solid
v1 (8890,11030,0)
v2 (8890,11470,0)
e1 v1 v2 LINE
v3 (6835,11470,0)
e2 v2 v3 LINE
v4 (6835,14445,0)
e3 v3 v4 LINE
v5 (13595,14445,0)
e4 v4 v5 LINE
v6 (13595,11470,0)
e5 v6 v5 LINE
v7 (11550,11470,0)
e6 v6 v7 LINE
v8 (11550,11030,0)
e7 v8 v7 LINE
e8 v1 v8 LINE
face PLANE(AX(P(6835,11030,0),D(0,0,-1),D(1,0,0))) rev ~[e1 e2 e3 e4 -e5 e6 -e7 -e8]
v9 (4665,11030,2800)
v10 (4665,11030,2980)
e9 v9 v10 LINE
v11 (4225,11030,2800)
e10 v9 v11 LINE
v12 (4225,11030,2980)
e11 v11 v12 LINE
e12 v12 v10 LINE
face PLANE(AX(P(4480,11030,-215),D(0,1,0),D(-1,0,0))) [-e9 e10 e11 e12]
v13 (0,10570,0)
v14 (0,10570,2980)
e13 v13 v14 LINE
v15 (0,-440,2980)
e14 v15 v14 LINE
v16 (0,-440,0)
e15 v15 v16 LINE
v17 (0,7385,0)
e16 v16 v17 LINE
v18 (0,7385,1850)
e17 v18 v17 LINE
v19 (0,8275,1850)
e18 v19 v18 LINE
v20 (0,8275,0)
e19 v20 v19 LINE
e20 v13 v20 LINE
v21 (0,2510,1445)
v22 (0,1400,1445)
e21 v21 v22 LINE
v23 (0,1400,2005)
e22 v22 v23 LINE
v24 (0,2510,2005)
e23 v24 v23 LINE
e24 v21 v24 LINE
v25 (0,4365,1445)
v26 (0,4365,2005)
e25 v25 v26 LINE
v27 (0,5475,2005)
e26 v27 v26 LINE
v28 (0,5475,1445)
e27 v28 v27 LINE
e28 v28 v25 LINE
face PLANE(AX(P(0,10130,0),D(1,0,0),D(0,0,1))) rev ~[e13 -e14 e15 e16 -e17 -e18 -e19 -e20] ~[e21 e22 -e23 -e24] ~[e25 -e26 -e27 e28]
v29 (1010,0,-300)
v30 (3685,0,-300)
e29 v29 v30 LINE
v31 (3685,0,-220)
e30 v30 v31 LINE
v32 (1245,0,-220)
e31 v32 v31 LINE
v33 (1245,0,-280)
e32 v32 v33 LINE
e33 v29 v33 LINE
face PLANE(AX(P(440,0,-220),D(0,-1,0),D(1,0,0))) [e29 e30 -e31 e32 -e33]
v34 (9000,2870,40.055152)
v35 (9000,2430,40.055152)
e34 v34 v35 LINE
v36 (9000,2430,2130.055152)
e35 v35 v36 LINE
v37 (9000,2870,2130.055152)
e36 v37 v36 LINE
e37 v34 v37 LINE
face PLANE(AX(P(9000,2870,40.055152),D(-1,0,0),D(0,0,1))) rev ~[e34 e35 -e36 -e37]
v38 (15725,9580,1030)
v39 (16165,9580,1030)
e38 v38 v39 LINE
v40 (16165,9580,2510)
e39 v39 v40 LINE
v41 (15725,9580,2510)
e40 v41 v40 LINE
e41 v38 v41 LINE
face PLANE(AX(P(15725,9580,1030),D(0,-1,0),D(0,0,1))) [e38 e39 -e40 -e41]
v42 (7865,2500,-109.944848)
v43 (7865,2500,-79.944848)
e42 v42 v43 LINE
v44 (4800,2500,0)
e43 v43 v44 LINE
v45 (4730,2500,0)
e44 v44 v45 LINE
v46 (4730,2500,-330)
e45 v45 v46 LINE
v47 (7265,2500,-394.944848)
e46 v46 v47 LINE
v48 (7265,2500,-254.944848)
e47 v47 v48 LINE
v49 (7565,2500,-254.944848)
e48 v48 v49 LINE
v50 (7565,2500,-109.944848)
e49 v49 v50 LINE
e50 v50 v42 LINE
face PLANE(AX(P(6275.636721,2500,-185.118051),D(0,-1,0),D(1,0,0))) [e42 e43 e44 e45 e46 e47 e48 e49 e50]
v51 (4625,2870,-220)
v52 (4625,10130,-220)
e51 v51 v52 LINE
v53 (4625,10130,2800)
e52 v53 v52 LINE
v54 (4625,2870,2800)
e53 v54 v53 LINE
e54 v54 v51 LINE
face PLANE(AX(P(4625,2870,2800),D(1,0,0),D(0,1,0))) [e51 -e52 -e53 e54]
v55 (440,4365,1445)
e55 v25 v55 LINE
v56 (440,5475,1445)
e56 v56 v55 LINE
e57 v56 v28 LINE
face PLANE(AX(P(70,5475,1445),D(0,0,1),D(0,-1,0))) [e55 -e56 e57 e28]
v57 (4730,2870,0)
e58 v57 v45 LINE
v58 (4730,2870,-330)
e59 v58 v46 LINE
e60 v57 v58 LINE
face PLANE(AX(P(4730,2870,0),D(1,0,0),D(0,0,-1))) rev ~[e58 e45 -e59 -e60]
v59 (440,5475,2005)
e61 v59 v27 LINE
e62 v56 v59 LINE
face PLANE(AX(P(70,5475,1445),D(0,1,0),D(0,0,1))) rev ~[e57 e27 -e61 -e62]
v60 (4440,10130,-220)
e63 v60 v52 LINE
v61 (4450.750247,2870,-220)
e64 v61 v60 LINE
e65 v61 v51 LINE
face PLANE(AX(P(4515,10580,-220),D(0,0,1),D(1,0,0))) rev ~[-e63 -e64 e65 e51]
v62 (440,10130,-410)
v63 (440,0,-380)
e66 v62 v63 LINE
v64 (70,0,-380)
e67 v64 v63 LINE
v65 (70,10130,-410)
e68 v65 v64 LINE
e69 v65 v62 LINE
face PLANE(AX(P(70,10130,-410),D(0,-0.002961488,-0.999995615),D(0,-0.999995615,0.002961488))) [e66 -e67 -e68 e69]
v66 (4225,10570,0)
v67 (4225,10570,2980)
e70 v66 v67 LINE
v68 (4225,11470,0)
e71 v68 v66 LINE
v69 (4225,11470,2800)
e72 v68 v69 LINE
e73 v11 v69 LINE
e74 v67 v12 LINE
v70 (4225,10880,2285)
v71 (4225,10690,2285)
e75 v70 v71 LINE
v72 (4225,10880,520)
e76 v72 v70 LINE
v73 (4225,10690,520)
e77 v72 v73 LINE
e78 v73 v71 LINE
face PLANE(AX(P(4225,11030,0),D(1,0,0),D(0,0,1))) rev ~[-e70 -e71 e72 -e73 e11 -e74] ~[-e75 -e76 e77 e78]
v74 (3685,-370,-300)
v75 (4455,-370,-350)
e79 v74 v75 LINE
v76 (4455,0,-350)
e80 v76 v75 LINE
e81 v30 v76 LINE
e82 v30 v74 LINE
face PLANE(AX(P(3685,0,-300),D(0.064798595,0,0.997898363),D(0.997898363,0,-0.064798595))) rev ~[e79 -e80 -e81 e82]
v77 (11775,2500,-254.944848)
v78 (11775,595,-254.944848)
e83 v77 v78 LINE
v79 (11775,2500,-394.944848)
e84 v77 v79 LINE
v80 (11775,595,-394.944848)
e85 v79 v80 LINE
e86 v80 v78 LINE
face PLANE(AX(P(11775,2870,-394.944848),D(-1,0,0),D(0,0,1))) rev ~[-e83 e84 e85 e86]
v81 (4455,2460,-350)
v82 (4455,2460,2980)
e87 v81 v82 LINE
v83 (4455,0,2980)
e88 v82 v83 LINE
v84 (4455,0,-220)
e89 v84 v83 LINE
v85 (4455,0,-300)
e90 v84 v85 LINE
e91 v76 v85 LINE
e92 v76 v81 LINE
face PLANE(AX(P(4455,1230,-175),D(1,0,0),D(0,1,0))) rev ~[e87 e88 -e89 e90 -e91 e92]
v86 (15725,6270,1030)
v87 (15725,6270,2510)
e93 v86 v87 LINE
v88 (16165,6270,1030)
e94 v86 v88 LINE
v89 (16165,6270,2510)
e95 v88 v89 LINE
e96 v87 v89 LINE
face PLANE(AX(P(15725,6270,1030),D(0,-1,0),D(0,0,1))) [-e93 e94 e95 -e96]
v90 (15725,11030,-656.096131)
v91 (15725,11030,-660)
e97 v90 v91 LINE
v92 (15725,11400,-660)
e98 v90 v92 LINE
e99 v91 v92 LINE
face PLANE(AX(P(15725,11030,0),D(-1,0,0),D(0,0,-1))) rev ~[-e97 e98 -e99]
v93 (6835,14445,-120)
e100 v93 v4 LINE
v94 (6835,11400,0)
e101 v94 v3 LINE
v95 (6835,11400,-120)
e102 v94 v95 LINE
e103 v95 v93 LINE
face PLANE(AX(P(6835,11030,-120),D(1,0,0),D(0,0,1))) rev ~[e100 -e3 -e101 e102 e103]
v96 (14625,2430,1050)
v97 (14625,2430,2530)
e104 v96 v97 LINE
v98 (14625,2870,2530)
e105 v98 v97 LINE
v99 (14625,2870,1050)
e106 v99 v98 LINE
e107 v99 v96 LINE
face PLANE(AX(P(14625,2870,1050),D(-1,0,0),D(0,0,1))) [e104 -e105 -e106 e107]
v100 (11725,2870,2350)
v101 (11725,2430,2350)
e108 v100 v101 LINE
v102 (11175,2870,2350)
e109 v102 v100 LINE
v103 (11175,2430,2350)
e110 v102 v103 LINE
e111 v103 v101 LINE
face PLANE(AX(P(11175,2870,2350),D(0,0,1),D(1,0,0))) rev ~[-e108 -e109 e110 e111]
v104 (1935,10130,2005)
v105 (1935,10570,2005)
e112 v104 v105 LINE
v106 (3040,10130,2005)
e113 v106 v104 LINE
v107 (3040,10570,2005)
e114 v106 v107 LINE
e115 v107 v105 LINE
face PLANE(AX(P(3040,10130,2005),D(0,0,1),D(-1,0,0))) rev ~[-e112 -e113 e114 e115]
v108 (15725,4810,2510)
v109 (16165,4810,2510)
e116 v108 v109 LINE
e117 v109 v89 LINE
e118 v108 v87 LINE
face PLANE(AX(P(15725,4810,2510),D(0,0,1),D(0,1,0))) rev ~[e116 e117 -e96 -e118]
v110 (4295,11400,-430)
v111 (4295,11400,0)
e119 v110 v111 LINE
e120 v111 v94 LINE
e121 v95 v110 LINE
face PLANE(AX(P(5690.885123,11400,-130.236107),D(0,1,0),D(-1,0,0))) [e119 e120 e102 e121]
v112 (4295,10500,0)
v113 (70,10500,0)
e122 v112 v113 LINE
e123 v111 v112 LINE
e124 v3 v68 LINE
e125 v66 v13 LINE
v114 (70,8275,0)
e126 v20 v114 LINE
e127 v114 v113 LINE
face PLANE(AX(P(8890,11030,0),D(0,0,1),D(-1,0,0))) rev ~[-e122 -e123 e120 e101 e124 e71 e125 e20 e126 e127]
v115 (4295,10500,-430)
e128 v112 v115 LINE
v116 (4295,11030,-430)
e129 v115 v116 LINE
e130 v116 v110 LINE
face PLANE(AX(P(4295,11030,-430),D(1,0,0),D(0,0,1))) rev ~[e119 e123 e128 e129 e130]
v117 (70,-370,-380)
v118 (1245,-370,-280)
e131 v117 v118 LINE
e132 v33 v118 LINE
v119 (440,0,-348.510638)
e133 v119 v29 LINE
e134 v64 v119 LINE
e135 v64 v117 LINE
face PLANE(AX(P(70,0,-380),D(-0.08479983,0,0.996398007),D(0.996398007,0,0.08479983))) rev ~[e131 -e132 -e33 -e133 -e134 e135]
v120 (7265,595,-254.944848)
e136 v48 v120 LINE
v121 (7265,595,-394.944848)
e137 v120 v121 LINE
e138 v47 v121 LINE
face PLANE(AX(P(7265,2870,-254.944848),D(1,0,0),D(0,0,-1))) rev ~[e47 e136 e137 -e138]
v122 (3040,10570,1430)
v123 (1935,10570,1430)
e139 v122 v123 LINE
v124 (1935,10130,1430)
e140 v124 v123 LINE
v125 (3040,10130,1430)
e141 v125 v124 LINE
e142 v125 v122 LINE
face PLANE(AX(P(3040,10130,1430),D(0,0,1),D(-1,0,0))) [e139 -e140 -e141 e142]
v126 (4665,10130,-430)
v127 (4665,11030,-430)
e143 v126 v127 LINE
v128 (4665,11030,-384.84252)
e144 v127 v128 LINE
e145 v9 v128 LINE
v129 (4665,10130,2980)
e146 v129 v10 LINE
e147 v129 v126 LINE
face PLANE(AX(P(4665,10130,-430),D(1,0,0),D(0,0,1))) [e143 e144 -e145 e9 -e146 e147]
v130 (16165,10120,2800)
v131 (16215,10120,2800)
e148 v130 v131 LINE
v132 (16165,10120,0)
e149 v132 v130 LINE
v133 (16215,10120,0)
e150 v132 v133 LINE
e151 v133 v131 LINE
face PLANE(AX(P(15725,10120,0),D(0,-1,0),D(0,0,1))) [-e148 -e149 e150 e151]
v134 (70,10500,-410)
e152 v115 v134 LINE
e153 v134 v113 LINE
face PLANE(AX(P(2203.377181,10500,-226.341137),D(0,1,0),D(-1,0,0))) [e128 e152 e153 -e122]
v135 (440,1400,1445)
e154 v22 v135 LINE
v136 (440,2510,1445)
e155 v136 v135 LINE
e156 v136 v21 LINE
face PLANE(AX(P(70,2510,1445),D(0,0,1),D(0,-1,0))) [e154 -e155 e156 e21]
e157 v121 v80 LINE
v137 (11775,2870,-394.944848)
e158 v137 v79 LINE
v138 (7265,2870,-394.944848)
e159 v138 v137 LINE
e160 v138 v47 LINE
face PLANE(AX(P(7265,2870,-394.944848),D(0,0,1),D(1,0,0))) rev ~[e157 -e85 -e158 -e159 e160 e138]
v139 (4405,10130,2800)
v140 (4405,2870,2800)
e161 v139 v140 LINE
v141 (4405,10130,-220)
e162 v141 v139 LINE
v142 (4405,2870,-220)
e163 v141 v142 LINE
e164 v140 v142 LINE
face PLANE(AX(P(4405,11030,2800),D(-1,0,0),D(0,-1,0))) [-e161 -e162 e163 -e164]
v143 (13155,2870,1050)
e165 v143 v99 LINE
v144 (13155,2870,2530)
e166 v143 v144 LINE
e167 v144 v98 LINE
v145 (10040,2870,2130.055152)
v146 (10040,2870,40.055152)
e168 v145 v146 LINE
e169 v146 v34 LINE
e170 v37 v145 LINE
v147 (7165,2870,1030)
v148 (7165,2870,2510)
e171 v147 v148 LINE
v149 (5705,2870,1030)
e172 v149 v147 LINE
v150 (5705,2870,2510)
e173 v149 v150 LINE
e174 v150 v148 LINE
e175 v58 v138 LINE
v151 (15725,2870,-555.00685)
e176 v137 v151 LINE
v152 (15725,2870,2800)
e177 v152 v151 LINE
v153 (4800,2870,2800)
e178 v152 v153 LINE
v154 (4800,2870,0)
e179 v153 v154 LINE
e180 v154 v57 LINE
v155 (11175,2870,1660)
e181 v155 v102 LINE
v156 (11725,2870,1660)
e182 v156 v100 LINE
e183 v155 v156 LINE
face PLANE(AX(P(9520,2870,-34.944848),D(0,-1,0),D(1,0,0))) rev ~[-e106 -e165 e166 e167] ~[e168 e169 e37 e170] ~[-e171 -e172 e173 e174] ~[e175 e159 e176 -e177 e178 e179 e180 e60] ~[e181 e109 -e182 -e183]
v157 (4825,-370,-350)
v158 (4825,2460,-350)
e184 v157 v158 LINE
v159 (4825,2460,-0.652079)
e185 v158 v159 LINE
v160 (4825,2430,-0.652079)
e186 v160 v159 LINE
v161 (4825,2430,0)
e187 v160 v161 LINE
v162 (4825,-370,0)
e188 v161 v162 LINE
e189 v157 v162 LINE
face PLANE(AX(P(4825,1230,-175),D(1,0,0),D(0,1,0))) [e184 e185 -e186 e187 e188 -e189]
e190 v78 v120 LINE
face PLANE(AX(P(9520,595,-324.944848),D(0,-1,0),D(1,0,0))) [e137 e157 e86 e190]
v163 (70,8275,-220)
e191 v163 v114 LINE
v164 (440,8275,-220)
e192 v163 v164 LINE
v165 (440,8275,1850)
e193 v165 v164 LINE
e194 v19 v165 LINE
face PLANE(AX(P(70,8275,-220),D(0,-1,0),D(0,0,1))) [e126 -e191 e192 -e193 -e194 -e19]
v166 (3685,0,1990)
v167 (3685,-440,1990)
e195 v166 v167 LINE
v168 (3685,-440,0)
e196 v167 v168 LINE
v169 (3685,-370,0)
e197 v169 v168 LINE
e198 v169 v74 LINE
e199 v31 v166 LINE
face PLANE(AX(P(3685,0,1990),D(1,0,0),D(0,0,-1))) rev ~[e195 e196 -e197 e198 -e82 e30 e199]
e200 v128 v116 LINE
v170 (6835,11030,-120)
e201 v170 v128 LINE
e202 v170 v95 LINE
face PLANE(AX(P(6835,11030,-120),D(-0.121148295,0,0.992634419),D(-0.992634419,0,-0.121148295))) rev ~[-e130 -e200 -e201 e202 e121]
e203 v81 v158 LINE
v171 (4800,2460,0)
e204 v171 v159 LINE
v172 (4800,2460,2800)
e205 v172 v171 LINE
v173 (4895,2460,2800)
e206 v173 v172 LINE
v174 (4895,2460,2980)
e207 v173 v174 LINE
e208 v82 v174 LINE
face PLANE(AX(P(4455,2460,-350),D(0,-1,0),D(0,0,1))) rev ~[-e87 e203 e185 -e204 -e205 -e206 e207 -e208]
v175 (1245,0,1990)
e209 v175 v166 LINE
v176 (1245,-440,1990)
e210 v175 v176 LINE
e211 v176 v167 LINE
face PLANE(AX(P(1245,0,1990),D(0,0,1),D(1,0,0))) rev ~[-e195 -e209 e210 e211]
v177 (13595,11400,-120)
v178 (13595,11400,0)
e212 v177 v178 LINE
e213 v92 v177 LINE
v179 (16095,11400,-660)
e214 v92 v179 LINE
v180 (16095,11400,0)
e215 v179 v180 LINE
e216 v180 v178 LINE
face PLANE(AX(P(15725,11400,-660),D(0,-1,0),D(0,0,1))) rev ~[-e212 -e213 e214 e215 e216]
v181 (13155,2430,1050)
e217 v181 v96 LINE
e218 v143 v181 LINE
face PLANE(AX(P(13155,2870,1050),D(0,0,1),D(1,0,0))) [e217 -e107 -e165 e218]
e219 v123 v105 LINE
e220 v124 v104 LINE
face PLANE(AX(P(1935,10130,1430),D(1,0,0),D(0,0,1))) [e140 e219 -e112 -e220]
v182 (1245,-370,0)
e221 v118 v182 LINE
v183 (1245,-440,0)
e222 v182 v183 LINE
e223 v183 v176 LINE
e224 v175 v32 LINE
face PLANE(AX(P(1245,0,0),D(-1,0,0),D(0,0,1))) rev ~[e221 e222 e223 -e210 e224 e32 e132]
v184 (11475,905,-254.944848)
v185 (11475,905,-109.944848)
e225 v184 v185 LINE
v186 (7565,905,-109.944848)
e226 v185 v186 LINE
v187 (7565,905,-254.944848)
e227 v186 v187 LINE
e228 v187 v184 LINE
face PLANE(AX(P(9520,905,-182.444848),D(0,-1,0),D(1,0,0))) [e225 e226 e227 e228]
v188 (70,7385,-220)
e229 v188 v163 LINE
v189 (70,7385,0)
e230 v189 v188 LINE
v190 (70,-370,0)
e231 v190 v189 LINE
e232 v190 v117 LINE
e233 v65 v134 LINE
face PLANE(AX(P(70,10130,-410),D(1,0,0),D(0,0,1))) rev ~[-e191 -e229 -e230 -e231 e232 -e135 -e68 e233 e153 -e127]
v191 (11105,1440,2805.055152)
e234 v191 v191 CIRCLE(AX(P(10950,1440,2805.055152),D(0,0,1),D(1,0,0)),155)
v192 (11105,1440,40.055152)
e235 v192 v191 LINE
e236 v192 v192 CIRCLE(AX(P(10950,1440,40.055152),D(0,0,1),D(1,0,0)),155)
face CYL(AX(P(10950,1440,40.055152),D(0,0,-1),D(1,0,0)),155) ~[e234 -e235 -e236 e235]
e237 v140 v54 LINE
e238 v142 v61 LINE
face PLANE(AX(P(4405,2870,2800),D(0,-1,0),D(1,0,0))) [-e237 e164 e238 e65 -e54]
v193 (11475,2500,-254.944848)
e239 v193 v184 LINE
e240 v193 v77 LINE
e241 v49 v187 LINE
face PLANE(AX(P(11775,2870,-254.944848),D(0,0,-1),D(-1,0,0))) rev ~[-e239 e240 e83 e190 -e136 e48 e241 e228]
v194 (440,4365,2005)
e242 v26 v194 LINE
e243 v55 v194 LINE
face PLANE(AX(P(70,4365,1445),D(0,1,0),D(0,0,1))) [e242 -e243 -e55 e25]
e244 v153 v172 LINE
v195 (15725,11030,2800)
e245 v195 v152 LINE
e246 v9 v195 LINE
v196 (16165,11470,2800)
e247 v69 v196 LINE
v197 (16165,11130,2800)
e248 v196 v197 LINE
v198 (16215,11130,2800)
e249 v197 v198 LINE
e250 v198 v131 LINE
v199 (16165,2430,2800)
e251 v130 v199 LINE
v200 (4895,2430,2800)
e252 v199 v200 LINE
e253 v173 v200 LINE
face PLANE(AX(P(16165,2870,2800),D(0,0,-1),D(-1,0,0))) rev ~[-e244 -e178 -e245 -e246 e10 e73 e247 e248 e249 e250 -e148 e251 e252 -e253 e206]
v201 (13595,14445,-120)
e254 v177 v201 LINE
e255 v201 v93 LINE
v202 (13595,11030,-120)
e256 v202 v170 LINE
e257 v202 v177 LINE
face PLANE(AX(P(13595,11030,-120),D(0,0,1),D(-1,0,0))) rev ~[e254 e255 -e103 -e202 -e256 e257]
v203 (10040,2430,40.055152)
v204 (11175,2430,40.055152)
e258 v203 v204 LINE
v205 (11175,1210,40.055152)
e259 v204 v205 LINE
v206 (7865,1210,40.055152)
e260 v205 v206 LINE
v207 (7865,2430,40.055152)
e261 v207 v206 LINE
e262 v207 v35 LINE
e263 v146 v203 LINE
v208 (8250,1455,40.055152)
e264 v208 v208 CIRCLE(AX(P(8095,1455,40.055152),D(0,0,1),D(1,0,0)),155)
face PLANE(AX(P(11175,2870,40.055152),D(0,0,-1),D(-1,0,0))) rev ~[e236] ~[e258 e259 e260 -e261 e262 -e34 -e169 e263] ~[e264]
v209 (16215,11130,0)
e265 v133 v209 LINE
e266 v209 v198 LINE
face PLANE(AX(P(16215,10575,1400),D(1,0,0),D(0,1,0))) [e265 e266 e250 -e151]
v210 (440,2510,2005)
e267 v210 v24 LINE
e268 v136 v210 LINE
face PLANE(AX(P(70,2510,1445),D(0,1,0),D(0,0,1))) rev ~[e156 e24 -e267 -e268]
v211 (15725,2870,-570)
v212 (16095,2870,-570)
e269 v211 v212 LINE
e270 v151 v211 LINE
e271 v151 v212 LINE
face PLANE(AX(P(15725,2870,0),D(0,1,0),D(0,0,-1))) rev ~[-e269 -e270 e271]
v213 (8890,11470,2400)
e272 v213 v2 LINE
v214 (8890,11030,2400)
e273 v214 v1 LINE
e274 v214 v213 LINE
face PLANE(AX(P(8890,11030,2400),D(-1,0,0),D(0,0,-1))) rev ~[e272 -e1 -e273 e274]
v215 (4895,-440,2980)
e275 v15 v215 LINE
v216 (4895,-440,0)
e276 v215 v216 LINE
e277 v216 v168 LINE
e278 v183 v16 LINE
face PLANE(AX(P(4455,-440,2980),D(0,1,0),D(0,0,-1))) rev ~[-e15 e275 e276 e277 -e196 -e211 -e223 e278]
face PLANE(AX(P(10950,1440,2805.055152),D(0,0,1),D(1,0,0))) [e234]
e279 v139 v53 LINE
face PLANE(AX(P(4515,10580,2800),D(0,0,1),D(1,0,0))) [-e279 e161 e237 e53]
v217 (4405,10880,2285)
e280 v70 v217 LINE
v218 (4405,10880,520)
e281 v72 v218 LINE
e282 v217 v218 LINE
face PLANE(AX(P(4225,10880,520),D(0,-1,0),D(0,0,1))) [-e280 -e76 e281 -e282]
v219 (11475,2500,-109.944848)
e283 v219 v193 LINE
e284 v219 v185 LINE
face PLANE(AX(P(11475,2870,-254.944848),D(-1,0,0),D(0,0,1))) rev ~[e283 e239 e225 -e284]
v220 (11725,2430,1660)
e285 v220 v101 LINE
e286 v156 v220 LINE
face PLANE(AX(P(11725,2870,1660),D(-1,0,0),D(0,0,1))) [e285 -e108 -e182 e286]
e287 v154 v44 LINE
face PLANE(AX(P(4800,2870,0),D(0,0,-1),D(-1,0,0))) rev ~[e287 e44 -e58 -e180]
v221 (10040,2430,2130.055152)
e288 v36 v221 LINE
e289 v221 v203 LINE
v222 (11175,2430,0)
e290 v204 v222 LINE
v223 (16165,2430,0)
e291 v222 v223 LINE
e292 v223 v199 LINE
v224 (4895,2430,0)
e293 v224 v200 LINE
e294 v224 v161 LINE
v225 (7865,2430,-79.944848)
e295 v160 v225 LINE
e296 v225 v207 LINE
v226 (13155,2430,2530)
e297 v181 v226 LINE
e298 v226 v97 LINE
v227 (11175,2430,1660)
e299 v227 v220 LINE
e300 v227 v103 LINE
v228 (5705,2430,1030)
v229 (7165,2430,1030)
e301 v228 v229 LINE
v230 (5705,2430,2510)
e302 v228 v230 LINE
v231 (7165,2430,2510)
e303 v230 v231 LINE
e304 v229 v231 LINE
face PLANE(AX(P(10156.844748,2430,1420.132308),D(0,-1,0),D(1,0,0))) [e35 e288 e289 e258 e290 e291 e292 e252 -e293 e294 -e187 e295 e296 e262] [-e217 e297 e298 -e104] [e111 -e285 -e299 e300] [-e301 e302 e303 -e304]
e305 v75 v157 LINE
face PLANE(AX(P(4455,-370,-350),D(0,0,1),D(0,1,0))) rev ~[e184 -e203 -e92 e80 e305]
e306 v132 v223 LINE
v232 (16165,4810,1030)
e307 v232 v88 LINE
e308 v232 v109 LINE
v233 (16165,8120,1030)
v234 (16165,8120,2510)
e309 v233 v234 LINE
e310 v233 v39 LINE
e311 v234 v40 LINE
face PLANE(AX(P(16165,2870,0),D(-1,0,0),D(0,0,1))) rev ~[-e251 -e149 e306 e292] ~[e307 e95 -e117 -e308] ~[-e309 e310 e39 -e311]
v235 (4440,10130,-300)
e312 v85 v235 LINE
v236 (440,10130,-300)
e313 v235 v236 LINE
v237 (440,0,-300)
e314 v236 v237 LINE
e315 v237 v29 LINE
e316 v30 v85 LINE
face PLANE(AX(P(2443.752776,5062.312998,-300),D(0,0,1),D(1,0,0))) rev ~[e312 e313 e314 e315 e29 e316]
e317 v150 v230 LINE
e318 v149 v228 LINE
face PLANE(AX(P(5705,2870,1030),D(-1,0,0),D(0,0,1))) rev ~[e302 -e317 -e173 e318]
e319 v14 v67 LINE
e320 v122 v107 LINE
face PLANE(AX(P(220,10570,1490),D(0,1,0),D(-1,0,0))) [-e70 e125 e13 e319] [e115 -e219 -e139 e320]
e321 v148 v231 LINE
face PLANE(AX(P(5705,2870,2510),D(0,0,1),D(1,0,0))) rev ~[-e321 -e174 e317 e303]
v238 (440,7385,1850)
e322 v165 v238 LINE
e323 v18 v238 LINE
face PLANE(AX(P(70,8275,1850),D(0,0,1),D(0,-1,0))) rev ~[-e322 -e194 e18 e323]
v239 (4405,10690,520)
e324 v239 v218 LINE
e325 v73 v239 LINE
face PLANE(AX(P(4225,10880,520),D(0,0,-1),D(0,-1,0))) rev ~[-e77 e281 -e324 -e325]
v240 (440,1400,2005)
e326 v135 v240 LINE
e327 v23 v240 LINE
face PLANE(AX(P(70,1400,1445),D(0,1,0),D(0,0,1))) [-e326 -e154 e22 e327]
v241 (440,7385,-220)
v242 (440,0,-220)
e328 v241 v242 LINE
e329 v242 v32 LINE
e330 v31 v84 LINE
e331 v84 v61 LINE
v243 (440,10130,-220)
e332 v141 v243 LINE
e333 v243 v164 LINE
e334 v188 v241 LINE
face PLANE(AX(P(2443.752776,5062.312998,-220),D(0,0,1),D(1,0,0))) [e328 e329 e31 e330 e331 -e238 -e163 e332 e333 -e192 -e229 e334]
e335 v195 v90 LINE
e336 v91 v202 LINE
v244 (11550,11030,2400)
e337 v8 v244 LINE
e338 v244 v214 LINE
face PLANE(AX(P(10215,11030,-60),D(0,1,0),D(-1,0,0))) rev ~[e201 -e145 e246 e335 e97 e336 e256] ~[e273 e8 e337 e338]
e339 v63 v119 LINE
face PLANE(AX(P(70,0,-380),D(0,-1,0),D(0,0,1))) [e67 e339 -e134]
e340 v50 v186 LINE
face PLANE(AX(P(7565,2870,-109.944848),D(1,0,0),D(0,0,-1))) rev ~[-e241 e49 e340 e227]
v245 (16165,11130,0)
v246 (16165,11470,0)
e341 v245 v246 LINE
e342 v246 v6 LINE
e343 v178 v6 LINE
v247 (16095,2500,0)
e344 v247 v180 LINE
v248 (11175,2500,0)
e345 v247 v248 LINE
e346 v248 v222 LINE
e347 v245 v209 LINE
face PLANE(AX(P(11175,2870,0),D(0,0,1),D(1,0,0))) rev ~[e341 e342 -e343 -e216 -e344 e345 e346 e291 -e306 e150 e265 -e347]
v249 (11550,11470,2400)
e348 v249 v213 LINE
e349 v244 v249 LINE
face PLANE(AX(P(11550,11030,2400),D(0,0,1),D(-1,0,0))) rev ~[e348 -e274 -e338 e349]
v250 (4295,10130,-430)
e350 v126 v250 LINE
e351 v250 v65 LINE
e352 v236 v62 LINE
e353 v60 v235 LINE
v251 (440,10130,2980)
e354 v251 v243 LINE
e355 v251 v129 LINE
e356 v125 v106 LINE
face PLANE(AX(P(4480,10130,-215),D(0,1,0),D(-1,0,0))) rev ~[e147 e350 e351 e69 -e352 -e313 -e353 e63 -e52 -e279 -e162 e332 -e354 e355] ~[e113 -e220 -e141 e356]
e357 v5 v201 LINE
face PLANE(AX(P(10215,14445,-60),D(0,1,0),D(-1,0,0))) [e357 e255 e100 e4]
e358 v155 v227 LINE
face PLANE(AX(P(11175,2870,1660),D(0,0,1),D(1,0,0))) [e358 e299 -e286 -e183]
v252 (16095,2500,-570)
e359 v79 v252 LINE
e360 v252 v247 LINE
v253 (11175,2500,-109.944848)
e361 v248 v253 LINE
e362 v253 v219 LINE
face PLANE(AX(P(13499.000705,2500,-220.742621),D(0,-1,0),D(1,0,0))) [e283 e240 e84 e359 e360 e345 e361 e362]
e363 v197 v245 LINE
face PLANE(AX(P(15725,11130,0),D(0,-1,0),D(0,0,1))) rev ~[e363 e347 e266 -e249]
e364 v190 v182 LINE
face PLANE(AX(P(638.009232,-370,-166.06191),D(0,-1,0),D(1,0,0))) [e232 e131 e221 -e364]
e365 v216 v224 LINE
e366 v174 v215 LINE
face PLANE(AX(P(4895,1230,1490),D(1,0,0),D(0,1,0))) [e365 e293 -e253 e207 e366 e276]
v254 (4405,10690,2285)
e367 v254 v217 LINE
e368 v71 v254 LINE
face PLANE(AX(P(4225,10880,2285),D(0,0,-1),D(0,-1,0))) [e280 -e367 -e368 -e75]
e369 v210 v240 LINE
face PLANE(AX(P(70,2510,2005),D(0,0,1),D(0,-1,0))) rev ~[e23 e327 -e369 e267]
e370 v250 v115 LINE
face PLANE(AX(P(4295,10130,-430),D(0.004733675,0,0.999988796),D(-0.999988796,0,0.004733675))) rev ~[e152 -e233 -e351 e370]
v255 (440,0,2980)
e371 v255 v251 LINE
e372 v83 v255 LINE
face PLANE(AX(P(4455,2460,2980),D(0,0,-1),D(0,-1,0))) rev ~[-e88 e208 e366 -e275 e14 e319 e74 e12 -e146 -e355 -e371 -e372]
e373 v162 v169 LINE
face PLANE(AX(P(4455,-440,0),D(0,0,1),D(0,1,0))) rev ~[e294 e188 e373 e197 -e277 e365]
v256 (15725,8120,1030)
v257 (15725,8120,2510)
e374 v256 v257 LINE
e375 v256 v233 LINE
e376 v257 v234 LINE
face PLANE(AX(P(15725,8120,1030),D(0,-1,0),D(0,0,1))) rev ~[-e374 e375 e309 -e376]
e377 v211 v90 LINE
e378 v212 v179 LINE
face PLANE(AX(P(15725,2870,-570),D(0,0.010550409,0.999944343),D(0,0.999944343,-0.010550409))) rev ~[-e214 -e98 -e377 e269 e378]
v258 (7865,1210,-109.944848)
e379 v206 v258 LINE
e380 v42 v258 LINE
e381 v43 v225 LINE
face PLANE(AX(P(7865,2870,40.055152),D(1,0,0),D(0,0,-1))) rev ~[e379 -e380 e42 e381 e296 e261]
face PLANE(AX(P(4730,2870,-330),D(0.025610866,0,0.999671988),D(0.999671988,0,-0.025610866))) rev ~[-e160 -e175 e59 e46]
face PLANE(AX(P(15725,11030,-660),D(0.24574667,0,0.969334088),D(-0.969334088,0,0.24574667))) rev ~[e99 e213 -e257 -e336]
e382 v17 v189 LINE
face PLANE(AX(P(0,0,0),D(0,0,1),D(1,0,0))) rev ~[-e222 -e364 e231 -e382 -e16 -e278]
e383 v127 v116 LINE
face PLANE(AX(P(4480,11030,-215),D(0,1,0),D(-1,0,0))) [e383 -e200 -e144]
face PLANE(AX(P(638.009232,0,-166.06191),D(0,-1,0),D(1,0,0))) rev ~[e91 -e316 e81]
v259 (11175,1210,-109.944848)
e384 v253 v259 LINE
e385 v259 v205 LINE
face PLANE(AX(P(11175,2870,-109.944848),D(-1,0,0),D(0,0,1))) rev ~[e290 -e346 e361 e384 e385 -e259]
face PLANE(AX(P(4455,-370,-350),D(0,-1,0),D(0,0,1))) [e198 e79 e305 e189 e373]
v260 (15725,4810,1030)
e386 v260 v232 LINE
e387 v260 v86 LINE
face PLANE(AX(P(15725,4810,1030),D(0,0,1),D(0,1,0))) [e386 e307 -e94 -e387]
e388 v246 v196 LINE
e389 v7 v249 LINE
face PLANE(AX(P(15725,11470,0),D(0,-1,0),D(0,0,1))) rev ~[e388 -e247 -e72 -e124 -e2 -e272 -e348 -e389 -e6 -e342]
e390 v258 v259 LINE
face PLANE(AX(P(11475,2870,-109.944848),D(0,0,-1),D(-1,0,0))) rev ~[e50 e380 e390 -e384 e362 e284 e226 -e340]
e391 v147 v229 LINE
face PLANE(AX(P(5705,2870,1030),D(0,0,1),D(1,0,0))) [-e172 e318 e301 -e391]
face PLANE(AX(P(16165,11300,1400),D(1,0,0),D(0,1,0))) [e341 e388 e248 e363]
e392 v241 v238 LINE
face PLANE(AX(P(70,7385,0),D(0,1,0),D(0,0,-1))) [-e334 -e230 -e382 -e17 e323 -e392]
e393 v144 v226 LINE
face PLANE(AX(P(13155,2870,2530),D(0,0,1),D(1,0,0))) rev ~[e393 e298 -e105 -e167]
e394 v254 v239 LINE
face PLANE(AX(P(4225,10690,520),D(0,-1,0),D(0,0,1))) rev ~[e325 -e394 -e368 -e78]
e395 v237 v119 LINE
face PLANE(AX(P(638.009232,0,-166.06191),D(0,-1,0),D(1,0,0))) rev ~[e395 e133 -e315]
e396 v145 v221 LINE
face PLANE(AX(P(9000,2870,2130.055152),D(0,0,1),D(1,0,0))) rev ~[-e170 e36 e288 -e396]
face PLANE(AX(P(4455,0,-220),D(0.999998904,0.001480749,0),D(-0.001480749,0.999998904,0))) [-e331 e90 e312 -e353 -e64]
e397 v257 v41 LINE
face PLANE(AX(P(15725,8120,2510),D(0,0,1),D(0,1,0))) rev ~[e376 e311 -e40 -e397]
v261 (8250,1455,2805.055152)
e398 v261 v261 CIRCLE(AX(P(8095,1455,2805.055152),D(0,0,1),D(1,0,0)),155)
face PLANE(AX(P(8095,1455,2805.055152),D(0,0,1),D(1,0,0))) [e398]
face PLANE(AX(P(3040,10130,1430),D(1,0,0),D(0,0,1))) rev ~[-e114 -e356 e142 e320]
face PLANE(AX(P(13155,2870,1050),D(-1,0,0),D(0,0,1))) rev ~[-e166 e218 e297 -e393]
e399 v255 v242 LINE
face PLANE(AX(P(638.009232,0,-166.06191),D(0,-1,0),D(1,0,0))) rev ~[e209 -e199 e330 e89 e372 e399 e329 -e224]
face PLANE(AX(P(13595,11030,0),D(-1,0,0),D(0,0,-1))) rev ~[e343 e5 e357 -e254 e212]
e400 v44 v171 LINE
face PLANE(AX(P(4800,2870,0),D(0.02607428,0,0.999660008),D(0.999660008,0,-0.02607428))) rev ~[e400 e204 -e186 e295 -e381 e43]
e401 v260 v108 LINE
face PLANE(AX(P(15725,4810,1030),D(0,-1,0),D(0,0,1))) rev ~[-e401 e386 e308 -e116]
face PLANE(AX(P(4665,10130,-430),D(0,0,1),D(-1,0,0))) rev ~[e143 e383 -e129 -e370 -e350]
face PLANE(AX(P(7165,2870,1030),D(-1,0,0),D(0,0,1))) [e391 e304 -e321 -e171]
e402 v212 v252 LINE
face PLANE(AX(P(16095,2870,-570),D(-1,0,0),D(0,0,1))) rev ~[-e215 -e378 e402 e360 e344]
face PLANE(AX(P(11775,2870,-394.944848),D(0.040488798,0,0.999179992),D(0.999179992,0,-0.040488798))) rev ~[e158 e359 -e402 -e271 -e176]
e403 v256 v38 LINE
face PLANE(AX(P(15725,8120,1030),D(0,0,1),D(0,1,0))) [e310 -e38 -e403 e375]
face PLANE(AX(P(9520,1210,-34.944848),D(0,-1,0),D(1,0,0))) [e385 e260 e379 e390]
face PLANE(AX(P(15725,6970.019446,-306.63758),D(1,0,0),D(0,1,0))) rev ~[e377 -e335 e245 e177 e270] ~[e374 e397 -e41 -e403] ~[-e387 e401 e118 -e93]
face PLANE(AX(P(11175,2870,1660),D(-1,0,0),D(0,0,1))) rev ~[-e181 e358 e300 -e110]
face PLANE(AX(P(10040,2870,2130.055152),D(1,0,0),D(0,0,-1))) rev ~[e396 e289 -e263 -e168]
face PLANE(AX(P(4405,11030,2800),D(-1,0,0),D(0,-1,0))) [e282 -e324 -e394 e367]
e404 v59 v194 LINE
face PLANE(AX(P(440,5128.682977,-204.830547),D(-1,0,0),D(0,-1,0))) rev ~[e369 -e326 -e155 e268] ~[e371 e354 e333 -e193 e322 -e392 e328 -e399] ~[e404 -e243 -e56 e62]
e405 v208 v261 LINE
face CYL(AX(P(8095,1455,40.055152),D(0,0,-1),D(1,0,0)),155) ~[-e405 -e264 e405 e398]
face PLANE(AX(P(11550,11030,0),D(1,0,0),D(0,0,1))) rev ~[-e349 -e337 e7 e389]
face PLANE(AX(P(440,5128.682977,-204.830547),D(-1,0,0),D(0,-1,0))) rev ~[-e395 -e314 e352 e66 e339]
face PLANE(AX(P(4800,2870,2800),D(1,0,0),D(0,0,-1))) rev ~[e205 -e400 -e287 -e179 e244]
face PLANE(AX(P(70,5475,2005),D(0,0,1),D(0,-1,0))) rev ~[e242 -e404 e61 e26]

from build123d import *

# Parameters (mm, degrees)
F1_DEPTH      = 440
F2_DEPTH      = 370
F3_W          = 1110
F3_H          = 560
F4_DEPTH      = 370
F4_DEPTH_BACK = 70
F5_DEPTH      = 370
F6_W          = 3785
F6_H          = 2980
F6_W_2        = 1105
F6_H_2        = 575
F7_DEPTH      = 440
F6_W_3        = 370
F6_H_3        = 410
F8_DEPTH      = 370
F9_DEPTH      = 900
F6_H_4        = 430
F10_DEPTH     = 900
F11_W         = 190
F11_H         = 1765
F12_DEPTH     = 400
F14_DEPTH     = 440
F15_DEPTH     = 370
F16_DEPTH     = 3415
F18_DEPTH     = 440
F17_W         = 7250
F17_H         = 2800
F17_W_2       = 1460
F17_H_2       = 1480
F17_W_3       = 910
F17_W_4       = 100
F19_DEPTH     = 490
F20_DEPTH     = 370
F21_W         = 1460
F21_H         = 1480
F21_W_2       = 1470
F21_W_3       = 550
F21_H_2       = 690
F22_DEPTH     = 440
F23_DEPTH     = 370
F24_DEPTH     = 2275
F25_DEPTH     = 1965
F26_DEPTH     = 1660
F27_R         = 155
F28_DEPTH     = 2765
F29_W         = 2460
F29_H         = 2980
F30_DEPTH     = 440
F29_H_2       = 350
F29_W_2       = 370
F31_DEPTH     = 370
F33_DEPTH     = 80
F34_W         = 220
F34_H         = 900
F34_H_2       = 7260
F35_DEPTH     = 3020


with BuildPart() as f1:
    # F0 (on Front) → F1 (new body)
    with BuildSketch(Plane.XZ):
        Polygon((0, 2980), (0, 0), (70, 0), (1245, 0), (1245, 1990), (3685, 1990), (3685, 0), (4455, 0), (4455, 2980), align=None)
    extrude(amount=F1_DEPTH)

    # F0 (on Front) → F2 (join)
    with BuildSketch(Plane.XZ):
        Polygon((1245, 0), (70, 0), (70, -380), (1245, -280), (1245, -180), align=None)
        Polygon((4455, -350), (4455, 0), (3685, 0), (3685, -180), (3685, -300), align=None)
    extrude(amount=F2_DEPTH)

    # F3 (on face) → F4 (join, two sides)
    with BuildSketch(Plane(origin=(70, 0, 0), x_dir=(0, -1, 0), z_dir=(-1, 0, 0))) as f4_sk:
        Polygon((440, 0), (440, 2980), (-10130, 2980), (-10130, 0), (-8275, 0), (-8275, 1850), (-7385, 1850), (-7385, 0), (0, 0), (370, 0), align=None)
        with Locations((-4920, 1725)):
            Rectangle(F3_W, F3_H, mode=Mode.SUBTRACT)
        with Locations((-1955, 1725)):
            Rectangle(F3_W, F3_H, mode=Mode.SUBTRACT)
    extrude(amount=-F4_DEPTH)
    extrude(f4_sk.sketch, amount=F4_DEPTH_BACK)

    # F3 (on face) → F5 (join)
    with BuildSketch(Plane(origin=(70, 0, 0), x_dir=(0, -1, 0), z_dir=(-1, 0, 0))):
        Polygon((-8275, 0), (-10130, 0), (-10130, -410), (0, -380), (0, 0), (-7385, 0), (-7385, -220), (-8275, -220), align=None)
    extrude(amount=-F5_DEPTH)

    # F6 (on face) → F7 (join)
    with BuildSketch(Plane(origin=(0, 10130, 0), x_dir=(-1, 0, 0), z_dir=(0, 1, 0))):
        Polygon((0, 0), (0, 2980), (-440, 2980), (-440, 0), (-70, 0), align=None)
        with Locations((-2332.5, 1490)):
            Rectangle(F6_W, F6_H)
        with Locations((-2487.5, 1717.5)):
            Rectangle(F6_W_2, F6_H_2, mode=Mode.SUBTRACT)
    extrude(amount=F7_DEPTH)

    # F6 (on face) → F8 (join)
    with BuildSketch(Plane(origin=(0, 10130, 0), x_dir=(-1, 0, 0), z_dir=(0, 1, 0))):
        Polygon((-440, -410), (-440, 0), (-4225, 0), (-4295, 0), (-4295, -430), (-70, -410), align=None)
        with Locations((-255, -205)):
            Rectangle(F6_W_3, F6_H_3)
    extrude(amount=F8_DEPTH)

    # F6 (on face) → F9 (join)
    with BuildSketch(Plane(origin=(0, 10130, 0), x_dir=(-1, 0, 0), z_dir=(0, 1, 0))):
        Polygon((-4225, 0), (-4225, 2980), (-4665, 2980), (-4665, 0), (-4295, 0), align=None)
    extrude(amount=F9_DEPTH)

    # F6 (on face) → F10 (join)
    with BuildSketch(Plane(origin=(0, 10130, 0), x_dir=(-1, 0, 0), z_dir=(0, 1, 0))):
        with Locations((-4480, -215)):
            Rectangle(F6_W_3, F6_H_4)
    extrude(amount=F10_DEPTH)

    # F11 (on face) → F12 (cut)
    with BuildSketch(Plane(origin=(4225, 0, 0), x_dir=(0, -1, 0), z_dir=(-1, 0, 0))):
        with Locations((-10785, 1402.5)):
            Rectangle(F11_W, F11_H)
    extrude(amount=-F12_DEPTH, mode=Mode.SUBTRACT)

    # F13 (on face) → F14 (join)
    with BuildSketch(Plane(origin=(0, 11030, 0), x_dir=(-1, 0, 0), z_dir=(0, 1, 0))):
        Polygon((-6835, 0), (-4665, 0), (-4665, 2800), (-15725, 2800), (-15725, 0), (-13595, 0), (-11550, 0), (-11550, 2400), (-8890, 2400), (-8890, 0), align=None)
        Polygon((-4295, 0), (-4225, 0), (-4225, 2800), (-4665, 2800), (-4665, 0), align=None)
    extrude(amount=F14_DEPTH)

    # F13 (on face) → F15 (join)
    with BuildSketch(Plane(origin=(0, 11030, 0), x_dir=(-1, 0, 0), z_dir=(0, 1, 0))):
        Polygon((-13595, 0), (-15725, 0), (-15725, -660), (-13595, -120), align=None)
        Polygon((-4665, -384.842519685), (-4665, 0), (-6835, 0), (-6835, -120), align=None)
        Polygon((-4295, -430), (-4295, 0), (-4665, 0), (-4665, -384.842519685), align=None)
    extrude(amount=F15_DEPTH)

    # F13 (on face) → F16 (join)
    with BuildSketch(Plane(origin=(0, 11030, 0), x_dir=(-1, 0, 0), z_dir=(0, 1, 0))):
        Polygon((-6835, -120), (-6835, 0), (-8890, 0), (-11550, 0), (-13595, 0), (-13595, -120), align=None)
    extrude(amount=F16_DEPTH)

    # F17 (on face) → F18 (join)
    with BuildSketch(Plane.YZ.offset(15725)):
        Polygon((11400, 0), (11470, 0), (11470, 2800), (11130, 2800), (11130, 0), align=None)
    extrude(amount=F18_DEPTH)



with BuildPart() as f18:
    # F17 (on face) → F18, piece 2 (new body)
    with BuildSketch(Plane.YZ.offset(15725)):
        with Locations((6495, 1400)):
            Rectangle(F17_W, F17_H)
        with Locations((5540, 1770)):
            Rectangle(F17_W_2, F17_H_2, mode=Mode.SUBTRACT)
        with Locations((8850, 1770)):
            Rectangle(F17_W_2, F17_H_2, mode=Mode.SUBTRACT)
    extrude(amount=F18_DEPTH)


with BuildPart() as f1_1:
    add(f1.part)

    add(f18.part)  # F19 merges F18
    # F17 (on face) → F19 (join)
    with BuildSketch(Plane.YZ.offset(15725)):
        with Locations((10575, 1400)):
            Rectangle(F17_W_3, F17_H)
        with Locations((11080, 1400)):
            Rectangle(F17_W_4, F17_H)
    extrude(amount=F19_DEPTH)

    # F17 (on face) → F20 (join)
    with BuildSketch(Plane.YZ.offset(15725)):
        Polygon((11030, -656.0961313013), (11030, 0), (10120, 0), (2870, 0), (2870, -570), align=None)
        Polygon((11400, -660), (11400, 0), (11130, 0), (11030, 0), (11030, -656.0961313013), align=None)
    extrude(amount=F20_DEPTH)

    # F21 (on face) → F22 (join)
    with BuildSketch(Plane.XZ.offset(-2870)):
        Polygon((15725, 0), (15725, 2800), (4800, 2800), (4800, 0), (7865, -79.944847658), (7865, 40.055152342), (9000, 40.055152342), (9000, 2130.055152342), (10040, 2130.055152342), (10040, 40.055152342), (11175, 40.055152342), (11175, 0), align=None)
        with Locations((6435, 1770)):
            Rectangle(F21_W, F21_H, mode=Mode.SUBTRACT)
        with Locations((13890, 1790)):
            Rectangle(F21_W_2, F21_H, mode=Mode.SUBTRACT)
        with Locations((11450, 2005)):
            Rectangle(F21_W_3, F21_H_2, mode=Mode.SUBTRACT)
        Polygon((16165, 0), (16165, 2800), (15725, 2800), (15725, 0), (16095, 0), align=None)
    extrude(amount=F22_DEPTH)

    # F21 (on face) → F23 (join)
    with BuildSketch(Plane.XZ.offset(-2870)):
        Polygon((15725, -555.0068503781), (15725, 0), (11175, 0), (11175, -109.944847658), (11475, -109.944847658), (11475, -254.944847658), (11775, -254.944847658), (11775, -394.944847658), align=None)
        Polygon((16095, 0), (15725, 0), (15725, -555.0068503781), (16095, -570), align=None)
        Polygon((7865, -79.944847658), (4800, 0), (4730, 0), (4730, -330), (7265, -394.944847658), (7265, -254.944847658), (7565, -254.944847658), (7565, -109.944847658), (7865, -109.944847658), align=None)
    extrude(amount=F23_DEPTH)

    # F21 (on face) → F24 (join)
    with BuildSketch(Plane.XZ.offset(-2870)):
        Polygon((7265, -394.944847658), (11775, -394.944847658), (11775, -254.944847658), (11475, -254.944847658), (7565, -254.944847658), (7265, -254.944847658), align=None)
    extrude(amount=F24_DEPTH)

    # F21 (on face) → F25 (join)
    with BuildSketch(Plane.XZ.offset(-2870)):
        Polygon((11475, -109.944847658), (11175, -109.944847658), (7865, -109.944847658), (7565, -109.944847658), (7565, -254.944847658), (11475, -254.944847658), align=None)
    extrude(amount=F25_DEPTH)

    # F21 (on face) → F26 (join)
    with BuildSketch(Plane.XZ.offset(-2870)):
        Polygon((11175, -109.944847658), (11175, 0), (11175, 40.055152342), (10040, 40.055152342), (9000, 40.055152342), (7865, 40.055152342), (7865, -79.944847658), (7865, -109.944847658), align=None)
    extrude(amount=F26_DEPTH)

    # F27 (on face) → F28 (join)
    with BuildSketch(Plane.XY.offset(40.055152342)):
        with Locations((8095, 1455)):
            Circle(F27_R)
        with Locations((10950, 1440)):
            Circle(F27_R)
    extrude(amount=F28_DEPTH)

    # F29 (on face) → F30 (join)
    with BuildSketch(Plane.YZ.offset(4455)):
        with Locations((1230, 1490)):
            Rectangle(F29_W, F29_H)
        Polygon((0, 0), (0, 2980), (-440, 2980), (-440, 0), (-370, 0), align=None)
    extrude(amount=F30_DEPTH)

    # F29 (on face) → F31 (join)
    with BuildSketch(Plane.YZ.offset(4455)):
        with Locations((1230, -175)):
            Rectangle(F29_W, F29_H_2)
        with Locations((-185, -175)):
            Rectangle(F29_W_2, F29_H_2)
    extrude(amount=F31_DEPTH)

    # F32 (on face) → F33 (join)
    with BuildSketch(Plane.XY.offset(-220)):
        Polygon((440, 10130), (440, 8275), (440, 7385), (440, 0), (4455, 0), (4440, 10130), align=None)
    extrude(amount=-F33_DEPTH)

    # F34 (on face) → F35 (join)
    with BuildSketch(Plane.XY.offset(2800)):
        with Locations((4515, 10580)):
            Rectangle(F34_W, F34_H)
        with Locations((4515, 6500)):
            Rectangle(F34_W, F34_H_2)
    extrude(amount=-F35_DEPTH)


solid = f1_1.part
